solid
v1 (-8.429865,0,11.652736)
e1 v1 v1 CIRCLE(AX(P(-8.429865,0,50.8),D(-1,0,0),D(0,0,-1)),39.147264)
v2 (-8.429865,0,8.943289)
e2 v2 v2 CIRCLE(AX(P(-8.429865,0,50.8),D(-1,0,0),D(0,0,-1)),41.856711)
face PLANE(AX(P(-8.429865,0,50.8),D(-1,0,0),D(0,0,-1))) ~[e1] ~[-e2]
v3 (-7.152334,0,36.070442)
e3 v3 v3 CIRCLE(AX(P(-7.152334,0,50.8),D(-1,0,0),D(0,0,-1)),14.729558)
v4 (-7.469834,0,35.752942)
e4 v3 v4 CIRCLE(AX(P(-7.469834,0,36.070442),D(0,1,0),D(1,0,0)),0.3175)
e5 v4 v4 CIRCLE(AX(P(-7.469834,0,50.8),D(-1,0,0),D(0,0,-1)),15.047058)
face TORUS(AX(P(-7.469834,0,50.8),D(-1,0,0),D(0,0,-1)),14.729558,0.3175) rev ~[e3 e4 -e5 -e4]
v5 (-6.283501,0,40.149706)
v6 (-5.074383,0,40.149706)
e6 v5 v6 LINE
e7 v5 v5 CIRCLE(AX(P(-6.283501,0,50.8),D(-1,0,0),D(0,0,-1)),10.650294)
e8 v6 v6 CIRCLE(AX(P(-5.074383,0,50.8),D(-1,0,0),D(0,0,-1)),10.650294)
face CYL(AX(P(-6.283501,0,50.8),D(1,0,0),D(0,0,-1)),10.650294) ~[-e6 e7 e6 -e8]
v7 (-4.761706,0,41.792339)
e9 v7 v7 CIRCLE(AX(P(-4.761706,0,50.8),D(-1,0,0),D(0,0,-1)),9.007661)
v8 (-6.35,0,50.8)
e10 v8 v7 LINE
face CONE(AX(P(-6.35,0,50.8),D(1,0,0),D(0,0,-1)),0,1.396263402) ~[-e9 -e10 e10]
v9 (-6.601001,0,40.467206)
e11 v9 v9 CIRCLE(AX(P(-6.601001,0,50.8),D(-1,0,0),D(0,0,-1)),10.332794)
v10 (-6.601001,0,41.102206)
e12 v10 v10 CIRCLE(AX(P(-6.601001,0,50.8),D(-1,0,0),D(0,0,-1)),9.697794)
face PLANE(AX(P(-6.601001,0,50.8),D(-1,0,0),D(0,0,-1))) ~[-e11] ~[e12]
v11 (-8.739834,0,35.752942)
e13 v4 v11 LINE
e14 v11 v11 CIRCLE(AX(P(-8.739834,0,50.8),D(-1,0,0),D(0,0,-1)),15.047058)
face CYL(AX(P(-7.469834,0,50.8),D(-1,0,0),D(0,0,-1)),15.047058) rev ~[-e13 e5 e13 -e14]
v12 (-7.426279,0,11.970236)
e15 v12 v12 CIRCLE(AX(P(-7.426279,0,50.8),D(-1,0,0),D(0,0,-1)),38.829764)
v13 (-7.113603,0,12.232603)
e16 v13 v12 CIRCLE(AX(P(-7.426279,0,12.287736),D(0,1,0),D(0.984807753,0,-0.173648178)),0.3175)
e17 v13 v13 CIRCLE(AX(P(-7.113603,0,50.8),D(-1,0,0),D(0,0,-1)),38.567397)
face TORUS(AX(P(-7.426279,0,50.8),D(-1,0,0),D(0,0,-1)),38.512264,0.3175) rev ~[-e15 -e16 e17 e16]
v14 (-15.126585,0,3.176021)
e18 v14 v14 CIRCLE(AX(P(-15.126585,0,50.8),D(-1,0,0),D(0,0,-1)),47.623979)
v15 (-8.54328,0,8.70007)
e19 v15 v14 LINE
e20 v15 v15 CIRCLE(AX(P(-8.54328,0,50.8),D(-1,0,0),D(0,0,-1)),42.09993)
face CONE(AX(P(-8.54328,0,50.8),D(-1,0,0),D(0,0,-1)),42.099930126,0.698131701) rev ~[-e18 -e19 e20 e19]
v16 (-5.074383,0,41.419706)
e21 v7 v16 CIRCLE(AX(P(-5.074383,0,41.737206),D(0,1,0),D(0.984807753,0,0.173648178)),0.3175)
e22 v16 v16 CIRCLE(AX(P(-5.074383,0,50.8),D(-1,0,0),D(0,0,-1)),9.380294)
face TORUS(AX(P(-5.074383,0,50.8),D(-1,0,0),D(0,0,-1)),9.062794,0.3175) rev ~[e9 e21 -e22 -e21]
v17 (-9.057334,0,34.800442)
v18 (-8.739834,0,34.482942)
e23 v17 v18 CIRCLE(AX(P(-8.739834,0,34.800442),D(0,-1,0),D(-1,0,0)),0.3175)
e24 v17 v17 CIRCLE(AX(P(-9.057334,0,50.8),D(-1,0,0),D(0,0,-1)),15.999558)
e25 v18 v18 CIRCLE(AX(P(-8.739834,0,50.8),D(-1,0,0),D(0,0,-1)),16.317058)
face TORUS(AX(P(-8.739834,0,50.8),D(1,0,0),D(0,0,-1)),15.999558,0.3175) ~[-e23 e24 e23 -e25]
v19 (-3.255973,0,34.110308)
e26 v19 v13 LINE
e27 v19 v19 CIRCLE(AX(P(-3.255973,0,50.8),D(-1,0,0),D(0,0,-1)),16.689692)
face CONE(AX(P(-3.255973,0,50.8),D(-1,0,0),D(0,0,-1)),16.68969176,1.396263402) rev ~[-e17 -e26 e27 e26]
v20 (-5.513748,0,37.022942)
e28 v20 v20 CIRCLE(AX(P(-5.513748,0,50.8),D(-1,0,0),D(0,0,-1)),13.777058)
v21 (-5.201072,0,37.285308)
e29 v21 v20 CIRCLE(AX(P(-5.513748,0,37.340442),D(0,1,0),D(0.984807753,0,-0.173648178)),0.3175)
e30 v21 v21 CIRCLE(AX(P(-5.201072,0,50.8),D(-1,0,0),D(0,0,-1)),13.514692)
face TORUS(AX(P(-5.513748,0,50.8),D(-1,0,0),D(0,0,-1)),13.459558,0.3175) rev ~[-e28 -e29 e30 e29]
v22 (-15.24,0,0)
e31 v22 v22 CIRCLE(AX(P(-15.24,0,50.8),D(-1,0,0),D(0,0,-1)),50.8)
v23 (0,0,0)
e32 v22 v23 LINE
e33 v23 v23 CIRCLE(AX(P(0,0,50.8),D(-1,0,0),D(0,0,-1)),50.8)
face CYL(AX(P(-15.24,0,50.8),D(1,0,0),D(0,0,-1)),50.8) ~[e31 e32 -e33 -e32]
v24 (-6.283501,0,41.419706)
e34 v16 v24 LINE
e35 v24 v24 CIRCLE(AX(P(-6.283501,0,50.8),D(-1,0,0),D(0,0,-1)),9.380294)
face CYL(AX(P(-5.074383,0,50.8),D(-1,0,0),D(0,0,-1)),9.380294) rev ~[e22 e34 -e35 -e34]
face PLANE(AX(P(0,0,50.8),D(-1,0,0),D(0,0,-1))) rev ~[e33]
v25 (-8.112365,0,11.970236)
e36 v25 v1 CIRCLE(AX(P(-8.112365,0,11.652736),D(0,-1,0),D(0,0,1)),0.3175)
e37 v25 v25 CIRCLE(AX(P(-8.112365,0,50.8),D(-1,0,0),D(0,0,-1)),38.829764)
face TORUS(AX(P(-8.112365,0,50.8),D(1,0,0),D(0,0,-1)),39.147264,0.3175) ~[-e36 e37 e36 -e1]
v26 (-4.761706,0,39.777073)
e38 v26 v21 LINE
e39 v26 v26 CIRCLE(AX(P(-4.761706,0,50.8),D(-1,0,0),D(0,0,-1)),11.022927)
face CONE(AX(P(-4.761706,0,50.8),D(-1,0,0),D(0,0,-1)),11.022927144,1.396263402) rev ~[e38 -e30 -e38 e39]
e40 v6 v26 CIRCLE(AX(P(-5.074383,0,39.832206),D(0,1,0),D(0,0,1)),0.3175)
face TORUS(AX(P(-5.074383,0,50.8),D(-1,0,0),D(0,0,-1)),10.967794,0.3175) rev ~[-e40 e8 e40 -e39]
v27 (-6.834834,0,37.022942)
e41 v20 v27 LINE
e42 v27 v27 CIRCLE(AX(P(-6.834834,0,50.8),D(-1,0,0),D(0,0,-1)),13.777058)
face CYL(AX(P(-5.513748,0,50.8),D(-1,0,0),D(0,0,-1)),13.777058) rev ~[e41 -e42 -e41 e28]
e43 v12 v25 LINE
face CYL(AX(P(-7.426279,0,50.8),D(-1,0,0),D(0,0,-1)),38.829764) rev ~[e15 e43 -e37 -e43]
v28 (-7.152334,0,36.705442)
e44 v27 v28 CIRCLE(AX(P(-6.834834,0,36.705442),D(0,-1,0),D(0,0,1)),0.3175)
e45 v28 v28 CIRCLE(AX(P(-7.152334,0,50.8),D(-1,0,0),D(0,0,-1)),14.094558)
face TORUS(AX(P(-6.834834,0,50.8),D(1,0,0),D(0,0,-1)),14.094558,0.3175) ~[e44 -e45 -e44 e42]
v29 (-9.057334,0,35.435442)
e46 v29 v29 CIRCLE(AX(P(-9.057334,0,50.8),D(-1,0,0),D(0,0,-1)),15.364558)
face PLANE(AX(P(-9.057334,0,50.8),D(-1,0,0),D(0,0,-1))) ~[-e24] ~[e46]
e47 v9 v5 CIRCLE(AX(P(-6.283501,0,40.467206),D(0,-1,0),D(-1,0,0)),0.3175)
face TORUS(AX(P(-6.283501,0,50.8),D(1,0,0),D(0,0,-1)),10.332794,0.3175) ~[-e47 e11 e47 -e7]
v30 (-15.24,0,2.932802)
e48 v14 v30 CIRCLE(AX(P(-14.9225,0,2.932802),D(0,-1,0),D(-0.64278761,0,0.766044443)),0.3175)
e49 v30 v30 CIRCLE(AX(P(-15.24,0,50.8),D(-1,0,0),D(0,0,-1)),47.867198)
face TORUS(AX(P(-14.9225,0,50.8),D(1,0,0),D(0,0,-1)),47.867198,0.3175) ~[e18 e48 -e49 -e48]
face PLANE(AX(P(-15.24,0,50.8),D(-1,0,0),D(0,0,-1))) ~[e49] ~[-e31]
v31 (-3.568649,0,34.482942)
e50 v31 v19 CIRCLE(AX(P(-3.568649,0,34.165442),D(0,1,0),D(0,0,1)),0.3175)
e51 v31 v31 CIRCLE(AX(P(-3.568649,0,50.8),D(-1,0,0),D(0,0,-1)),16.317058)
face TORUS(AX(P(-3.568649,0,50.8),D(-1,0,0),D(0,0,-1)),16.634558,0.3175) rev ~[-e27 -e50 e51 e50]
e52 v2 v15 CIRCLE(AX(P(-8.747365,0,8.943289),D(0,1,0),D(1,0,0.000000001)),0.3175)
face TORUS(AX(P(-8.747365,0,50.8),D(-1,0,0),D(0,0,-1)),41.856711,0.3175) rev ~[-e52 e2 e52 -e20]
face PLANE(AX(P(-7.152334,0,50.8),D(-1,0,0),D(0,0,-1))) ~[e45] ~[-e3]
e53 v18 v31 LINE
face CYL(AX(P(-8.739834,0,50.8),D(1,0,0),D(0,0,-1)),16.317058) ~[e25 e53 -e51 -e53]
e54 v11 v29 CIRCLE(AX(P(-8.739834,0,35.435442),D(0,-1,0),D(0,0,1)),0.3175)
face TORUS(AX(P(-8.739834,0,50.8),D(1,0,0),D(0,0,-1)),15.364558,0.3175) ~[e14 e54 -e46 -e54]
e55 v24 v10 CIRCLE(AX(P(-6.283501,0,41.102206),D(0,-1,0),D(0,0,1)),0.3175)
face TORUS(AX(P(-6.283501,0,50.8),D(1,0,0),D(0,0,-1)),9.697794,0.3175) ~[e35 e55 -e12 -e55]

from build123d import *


# Not quite as in the source:
# - a feature of the source that left no trace in its solid (it failed there, or was rolled back) is left out


with BuildPart() as f1:
    # F0 (on Front) → F1 (revolve)
    with BuildSketch(Plane.XZ):
        with BuildLine():
            Line((-15.24, 0), (0, 0))
            Line((0, 0), (0, 50.8))
            Line((0, 50.8), (-6.35, 50.8))
            Line((-6.35, 50.8), (-4.7617064118, 41.792339449))
            ThreePointArc((-4.7617064118, 41.792339449), (-4.8311637627, 41.5331210865), (-5.0743828734, 41.4197061526))
            Line((-5.0743828734, 41.4197061526), (-6.2835011077, 41.4197061526))
            ThreePointArc((-6.2835011077, 41.4197061526), (-6.5080075107, 41.3267125556), (-6.6010011077, 41.1022061526))
            Line((-6.6010011077, 41.1022061526), (-6.6010011077, 40.4672061526))
            ThreePointArc((-6.6010011077, 40.4672061526), (-6.5080075107, 40.2426997495), (-6.2835011077, 40.1497061526))
            Line((-6.2835011077, 40.1497061526), (-5.0743828734, 40.1497061526))
            ThreePointArc((-5.0743828734, 40.1497061526), (-4.8311637627, 40.0362912186), (-4.7617064118, 39.7770728561))
            Line((-4.7617064118, 39.7770728561), (-5.2010717431, 37.2853082403))
            ThreePointArc((-5.2010717431, 37.2853082403), (-5.3096631386, 37.0972224261), (-5.5137482047, 37.0229415367))
            Line((-5.5137482047, 37.0229415367), (-6.8348340718, 37.0229415367))
            ThreePointArc((-6.8348340718, 37.0229415367), (-7.0593404748, 36.9299479398), (-7.1523340718, 36.7054415367))
            Line((-7.1523340718, 36.7054415367), (-7.1523340718, 36.0704415367))
            ThreePointArc((-7.1523340718, 36.0704415367), (-7.2453276688, 35.8459351337), (-7.4698340718, 35.7529415367))
            Line((-7.4698340718, 35.7529415367), (-8.7398340718, 35.7529415367))
            ThreePointArc((-8.7398340718, 35.7529415367), (-8.9643404748, 35.6599479398), (-9.0573340718, 35.4354415367))
            Line((-9.0573340718, 35.4354415367), (-9.0573340718, 34.8004415367))
            ThreePointArc((-9.0573340718, 34.8004415367), (-8.9643404748, 34.5759351337), (-8.7398340718, 34.4829415367))
            Line((-8.7398340718, 34.4829415367), (-3.5686493249, 34.4829415367))
            ThreePointArc((-3.5686493249, 34.4829415367), (-3.3254302142, 34.3695266028), (-3.2559728633, 34.1103082403))
            Line((-3.2559728633, 34.1103082403), (-7.113602572, 12.2326030065))
            ThreePointArc((-7.113602572, 12.2326030065), (-7.2221939675, 12.0445171922), (-7.4262790336, 11.9702363029))
            Line((-7.4262790336, 11.9702363029), (-8.1123649007, 11.9702363029))
            ThreePointArc((-8.1123649007, 11.9702363029), (-8.3368713037, 11.8772427059), (-8.4298649007, 11.6527363029))
            Line((-8.4298649007, 11.6527363029), (-8.4298649007, 8.9432889844))
            ThreePointArc((-8.4298649007, 8.9432889844), (-8.4596121783, 8.8091076862), (-8.5432798346, 8.7000698737))
            Line((-8.5432798346, 8.7000698737), (-15.1265850661, 3.176020882))
            ThreePointArc((-15.1265850661, 3.176020882), (-15.2102527224, 3.0669830694), (-15.24, 2.9328017713))
            Line((-15.24, 2.9328017713), (-15.24, 0))
        make_face()
    revolve(axis=Axis((-3.175, 0, 50.8), (-1, 0, 0)))


solid = f1.part
